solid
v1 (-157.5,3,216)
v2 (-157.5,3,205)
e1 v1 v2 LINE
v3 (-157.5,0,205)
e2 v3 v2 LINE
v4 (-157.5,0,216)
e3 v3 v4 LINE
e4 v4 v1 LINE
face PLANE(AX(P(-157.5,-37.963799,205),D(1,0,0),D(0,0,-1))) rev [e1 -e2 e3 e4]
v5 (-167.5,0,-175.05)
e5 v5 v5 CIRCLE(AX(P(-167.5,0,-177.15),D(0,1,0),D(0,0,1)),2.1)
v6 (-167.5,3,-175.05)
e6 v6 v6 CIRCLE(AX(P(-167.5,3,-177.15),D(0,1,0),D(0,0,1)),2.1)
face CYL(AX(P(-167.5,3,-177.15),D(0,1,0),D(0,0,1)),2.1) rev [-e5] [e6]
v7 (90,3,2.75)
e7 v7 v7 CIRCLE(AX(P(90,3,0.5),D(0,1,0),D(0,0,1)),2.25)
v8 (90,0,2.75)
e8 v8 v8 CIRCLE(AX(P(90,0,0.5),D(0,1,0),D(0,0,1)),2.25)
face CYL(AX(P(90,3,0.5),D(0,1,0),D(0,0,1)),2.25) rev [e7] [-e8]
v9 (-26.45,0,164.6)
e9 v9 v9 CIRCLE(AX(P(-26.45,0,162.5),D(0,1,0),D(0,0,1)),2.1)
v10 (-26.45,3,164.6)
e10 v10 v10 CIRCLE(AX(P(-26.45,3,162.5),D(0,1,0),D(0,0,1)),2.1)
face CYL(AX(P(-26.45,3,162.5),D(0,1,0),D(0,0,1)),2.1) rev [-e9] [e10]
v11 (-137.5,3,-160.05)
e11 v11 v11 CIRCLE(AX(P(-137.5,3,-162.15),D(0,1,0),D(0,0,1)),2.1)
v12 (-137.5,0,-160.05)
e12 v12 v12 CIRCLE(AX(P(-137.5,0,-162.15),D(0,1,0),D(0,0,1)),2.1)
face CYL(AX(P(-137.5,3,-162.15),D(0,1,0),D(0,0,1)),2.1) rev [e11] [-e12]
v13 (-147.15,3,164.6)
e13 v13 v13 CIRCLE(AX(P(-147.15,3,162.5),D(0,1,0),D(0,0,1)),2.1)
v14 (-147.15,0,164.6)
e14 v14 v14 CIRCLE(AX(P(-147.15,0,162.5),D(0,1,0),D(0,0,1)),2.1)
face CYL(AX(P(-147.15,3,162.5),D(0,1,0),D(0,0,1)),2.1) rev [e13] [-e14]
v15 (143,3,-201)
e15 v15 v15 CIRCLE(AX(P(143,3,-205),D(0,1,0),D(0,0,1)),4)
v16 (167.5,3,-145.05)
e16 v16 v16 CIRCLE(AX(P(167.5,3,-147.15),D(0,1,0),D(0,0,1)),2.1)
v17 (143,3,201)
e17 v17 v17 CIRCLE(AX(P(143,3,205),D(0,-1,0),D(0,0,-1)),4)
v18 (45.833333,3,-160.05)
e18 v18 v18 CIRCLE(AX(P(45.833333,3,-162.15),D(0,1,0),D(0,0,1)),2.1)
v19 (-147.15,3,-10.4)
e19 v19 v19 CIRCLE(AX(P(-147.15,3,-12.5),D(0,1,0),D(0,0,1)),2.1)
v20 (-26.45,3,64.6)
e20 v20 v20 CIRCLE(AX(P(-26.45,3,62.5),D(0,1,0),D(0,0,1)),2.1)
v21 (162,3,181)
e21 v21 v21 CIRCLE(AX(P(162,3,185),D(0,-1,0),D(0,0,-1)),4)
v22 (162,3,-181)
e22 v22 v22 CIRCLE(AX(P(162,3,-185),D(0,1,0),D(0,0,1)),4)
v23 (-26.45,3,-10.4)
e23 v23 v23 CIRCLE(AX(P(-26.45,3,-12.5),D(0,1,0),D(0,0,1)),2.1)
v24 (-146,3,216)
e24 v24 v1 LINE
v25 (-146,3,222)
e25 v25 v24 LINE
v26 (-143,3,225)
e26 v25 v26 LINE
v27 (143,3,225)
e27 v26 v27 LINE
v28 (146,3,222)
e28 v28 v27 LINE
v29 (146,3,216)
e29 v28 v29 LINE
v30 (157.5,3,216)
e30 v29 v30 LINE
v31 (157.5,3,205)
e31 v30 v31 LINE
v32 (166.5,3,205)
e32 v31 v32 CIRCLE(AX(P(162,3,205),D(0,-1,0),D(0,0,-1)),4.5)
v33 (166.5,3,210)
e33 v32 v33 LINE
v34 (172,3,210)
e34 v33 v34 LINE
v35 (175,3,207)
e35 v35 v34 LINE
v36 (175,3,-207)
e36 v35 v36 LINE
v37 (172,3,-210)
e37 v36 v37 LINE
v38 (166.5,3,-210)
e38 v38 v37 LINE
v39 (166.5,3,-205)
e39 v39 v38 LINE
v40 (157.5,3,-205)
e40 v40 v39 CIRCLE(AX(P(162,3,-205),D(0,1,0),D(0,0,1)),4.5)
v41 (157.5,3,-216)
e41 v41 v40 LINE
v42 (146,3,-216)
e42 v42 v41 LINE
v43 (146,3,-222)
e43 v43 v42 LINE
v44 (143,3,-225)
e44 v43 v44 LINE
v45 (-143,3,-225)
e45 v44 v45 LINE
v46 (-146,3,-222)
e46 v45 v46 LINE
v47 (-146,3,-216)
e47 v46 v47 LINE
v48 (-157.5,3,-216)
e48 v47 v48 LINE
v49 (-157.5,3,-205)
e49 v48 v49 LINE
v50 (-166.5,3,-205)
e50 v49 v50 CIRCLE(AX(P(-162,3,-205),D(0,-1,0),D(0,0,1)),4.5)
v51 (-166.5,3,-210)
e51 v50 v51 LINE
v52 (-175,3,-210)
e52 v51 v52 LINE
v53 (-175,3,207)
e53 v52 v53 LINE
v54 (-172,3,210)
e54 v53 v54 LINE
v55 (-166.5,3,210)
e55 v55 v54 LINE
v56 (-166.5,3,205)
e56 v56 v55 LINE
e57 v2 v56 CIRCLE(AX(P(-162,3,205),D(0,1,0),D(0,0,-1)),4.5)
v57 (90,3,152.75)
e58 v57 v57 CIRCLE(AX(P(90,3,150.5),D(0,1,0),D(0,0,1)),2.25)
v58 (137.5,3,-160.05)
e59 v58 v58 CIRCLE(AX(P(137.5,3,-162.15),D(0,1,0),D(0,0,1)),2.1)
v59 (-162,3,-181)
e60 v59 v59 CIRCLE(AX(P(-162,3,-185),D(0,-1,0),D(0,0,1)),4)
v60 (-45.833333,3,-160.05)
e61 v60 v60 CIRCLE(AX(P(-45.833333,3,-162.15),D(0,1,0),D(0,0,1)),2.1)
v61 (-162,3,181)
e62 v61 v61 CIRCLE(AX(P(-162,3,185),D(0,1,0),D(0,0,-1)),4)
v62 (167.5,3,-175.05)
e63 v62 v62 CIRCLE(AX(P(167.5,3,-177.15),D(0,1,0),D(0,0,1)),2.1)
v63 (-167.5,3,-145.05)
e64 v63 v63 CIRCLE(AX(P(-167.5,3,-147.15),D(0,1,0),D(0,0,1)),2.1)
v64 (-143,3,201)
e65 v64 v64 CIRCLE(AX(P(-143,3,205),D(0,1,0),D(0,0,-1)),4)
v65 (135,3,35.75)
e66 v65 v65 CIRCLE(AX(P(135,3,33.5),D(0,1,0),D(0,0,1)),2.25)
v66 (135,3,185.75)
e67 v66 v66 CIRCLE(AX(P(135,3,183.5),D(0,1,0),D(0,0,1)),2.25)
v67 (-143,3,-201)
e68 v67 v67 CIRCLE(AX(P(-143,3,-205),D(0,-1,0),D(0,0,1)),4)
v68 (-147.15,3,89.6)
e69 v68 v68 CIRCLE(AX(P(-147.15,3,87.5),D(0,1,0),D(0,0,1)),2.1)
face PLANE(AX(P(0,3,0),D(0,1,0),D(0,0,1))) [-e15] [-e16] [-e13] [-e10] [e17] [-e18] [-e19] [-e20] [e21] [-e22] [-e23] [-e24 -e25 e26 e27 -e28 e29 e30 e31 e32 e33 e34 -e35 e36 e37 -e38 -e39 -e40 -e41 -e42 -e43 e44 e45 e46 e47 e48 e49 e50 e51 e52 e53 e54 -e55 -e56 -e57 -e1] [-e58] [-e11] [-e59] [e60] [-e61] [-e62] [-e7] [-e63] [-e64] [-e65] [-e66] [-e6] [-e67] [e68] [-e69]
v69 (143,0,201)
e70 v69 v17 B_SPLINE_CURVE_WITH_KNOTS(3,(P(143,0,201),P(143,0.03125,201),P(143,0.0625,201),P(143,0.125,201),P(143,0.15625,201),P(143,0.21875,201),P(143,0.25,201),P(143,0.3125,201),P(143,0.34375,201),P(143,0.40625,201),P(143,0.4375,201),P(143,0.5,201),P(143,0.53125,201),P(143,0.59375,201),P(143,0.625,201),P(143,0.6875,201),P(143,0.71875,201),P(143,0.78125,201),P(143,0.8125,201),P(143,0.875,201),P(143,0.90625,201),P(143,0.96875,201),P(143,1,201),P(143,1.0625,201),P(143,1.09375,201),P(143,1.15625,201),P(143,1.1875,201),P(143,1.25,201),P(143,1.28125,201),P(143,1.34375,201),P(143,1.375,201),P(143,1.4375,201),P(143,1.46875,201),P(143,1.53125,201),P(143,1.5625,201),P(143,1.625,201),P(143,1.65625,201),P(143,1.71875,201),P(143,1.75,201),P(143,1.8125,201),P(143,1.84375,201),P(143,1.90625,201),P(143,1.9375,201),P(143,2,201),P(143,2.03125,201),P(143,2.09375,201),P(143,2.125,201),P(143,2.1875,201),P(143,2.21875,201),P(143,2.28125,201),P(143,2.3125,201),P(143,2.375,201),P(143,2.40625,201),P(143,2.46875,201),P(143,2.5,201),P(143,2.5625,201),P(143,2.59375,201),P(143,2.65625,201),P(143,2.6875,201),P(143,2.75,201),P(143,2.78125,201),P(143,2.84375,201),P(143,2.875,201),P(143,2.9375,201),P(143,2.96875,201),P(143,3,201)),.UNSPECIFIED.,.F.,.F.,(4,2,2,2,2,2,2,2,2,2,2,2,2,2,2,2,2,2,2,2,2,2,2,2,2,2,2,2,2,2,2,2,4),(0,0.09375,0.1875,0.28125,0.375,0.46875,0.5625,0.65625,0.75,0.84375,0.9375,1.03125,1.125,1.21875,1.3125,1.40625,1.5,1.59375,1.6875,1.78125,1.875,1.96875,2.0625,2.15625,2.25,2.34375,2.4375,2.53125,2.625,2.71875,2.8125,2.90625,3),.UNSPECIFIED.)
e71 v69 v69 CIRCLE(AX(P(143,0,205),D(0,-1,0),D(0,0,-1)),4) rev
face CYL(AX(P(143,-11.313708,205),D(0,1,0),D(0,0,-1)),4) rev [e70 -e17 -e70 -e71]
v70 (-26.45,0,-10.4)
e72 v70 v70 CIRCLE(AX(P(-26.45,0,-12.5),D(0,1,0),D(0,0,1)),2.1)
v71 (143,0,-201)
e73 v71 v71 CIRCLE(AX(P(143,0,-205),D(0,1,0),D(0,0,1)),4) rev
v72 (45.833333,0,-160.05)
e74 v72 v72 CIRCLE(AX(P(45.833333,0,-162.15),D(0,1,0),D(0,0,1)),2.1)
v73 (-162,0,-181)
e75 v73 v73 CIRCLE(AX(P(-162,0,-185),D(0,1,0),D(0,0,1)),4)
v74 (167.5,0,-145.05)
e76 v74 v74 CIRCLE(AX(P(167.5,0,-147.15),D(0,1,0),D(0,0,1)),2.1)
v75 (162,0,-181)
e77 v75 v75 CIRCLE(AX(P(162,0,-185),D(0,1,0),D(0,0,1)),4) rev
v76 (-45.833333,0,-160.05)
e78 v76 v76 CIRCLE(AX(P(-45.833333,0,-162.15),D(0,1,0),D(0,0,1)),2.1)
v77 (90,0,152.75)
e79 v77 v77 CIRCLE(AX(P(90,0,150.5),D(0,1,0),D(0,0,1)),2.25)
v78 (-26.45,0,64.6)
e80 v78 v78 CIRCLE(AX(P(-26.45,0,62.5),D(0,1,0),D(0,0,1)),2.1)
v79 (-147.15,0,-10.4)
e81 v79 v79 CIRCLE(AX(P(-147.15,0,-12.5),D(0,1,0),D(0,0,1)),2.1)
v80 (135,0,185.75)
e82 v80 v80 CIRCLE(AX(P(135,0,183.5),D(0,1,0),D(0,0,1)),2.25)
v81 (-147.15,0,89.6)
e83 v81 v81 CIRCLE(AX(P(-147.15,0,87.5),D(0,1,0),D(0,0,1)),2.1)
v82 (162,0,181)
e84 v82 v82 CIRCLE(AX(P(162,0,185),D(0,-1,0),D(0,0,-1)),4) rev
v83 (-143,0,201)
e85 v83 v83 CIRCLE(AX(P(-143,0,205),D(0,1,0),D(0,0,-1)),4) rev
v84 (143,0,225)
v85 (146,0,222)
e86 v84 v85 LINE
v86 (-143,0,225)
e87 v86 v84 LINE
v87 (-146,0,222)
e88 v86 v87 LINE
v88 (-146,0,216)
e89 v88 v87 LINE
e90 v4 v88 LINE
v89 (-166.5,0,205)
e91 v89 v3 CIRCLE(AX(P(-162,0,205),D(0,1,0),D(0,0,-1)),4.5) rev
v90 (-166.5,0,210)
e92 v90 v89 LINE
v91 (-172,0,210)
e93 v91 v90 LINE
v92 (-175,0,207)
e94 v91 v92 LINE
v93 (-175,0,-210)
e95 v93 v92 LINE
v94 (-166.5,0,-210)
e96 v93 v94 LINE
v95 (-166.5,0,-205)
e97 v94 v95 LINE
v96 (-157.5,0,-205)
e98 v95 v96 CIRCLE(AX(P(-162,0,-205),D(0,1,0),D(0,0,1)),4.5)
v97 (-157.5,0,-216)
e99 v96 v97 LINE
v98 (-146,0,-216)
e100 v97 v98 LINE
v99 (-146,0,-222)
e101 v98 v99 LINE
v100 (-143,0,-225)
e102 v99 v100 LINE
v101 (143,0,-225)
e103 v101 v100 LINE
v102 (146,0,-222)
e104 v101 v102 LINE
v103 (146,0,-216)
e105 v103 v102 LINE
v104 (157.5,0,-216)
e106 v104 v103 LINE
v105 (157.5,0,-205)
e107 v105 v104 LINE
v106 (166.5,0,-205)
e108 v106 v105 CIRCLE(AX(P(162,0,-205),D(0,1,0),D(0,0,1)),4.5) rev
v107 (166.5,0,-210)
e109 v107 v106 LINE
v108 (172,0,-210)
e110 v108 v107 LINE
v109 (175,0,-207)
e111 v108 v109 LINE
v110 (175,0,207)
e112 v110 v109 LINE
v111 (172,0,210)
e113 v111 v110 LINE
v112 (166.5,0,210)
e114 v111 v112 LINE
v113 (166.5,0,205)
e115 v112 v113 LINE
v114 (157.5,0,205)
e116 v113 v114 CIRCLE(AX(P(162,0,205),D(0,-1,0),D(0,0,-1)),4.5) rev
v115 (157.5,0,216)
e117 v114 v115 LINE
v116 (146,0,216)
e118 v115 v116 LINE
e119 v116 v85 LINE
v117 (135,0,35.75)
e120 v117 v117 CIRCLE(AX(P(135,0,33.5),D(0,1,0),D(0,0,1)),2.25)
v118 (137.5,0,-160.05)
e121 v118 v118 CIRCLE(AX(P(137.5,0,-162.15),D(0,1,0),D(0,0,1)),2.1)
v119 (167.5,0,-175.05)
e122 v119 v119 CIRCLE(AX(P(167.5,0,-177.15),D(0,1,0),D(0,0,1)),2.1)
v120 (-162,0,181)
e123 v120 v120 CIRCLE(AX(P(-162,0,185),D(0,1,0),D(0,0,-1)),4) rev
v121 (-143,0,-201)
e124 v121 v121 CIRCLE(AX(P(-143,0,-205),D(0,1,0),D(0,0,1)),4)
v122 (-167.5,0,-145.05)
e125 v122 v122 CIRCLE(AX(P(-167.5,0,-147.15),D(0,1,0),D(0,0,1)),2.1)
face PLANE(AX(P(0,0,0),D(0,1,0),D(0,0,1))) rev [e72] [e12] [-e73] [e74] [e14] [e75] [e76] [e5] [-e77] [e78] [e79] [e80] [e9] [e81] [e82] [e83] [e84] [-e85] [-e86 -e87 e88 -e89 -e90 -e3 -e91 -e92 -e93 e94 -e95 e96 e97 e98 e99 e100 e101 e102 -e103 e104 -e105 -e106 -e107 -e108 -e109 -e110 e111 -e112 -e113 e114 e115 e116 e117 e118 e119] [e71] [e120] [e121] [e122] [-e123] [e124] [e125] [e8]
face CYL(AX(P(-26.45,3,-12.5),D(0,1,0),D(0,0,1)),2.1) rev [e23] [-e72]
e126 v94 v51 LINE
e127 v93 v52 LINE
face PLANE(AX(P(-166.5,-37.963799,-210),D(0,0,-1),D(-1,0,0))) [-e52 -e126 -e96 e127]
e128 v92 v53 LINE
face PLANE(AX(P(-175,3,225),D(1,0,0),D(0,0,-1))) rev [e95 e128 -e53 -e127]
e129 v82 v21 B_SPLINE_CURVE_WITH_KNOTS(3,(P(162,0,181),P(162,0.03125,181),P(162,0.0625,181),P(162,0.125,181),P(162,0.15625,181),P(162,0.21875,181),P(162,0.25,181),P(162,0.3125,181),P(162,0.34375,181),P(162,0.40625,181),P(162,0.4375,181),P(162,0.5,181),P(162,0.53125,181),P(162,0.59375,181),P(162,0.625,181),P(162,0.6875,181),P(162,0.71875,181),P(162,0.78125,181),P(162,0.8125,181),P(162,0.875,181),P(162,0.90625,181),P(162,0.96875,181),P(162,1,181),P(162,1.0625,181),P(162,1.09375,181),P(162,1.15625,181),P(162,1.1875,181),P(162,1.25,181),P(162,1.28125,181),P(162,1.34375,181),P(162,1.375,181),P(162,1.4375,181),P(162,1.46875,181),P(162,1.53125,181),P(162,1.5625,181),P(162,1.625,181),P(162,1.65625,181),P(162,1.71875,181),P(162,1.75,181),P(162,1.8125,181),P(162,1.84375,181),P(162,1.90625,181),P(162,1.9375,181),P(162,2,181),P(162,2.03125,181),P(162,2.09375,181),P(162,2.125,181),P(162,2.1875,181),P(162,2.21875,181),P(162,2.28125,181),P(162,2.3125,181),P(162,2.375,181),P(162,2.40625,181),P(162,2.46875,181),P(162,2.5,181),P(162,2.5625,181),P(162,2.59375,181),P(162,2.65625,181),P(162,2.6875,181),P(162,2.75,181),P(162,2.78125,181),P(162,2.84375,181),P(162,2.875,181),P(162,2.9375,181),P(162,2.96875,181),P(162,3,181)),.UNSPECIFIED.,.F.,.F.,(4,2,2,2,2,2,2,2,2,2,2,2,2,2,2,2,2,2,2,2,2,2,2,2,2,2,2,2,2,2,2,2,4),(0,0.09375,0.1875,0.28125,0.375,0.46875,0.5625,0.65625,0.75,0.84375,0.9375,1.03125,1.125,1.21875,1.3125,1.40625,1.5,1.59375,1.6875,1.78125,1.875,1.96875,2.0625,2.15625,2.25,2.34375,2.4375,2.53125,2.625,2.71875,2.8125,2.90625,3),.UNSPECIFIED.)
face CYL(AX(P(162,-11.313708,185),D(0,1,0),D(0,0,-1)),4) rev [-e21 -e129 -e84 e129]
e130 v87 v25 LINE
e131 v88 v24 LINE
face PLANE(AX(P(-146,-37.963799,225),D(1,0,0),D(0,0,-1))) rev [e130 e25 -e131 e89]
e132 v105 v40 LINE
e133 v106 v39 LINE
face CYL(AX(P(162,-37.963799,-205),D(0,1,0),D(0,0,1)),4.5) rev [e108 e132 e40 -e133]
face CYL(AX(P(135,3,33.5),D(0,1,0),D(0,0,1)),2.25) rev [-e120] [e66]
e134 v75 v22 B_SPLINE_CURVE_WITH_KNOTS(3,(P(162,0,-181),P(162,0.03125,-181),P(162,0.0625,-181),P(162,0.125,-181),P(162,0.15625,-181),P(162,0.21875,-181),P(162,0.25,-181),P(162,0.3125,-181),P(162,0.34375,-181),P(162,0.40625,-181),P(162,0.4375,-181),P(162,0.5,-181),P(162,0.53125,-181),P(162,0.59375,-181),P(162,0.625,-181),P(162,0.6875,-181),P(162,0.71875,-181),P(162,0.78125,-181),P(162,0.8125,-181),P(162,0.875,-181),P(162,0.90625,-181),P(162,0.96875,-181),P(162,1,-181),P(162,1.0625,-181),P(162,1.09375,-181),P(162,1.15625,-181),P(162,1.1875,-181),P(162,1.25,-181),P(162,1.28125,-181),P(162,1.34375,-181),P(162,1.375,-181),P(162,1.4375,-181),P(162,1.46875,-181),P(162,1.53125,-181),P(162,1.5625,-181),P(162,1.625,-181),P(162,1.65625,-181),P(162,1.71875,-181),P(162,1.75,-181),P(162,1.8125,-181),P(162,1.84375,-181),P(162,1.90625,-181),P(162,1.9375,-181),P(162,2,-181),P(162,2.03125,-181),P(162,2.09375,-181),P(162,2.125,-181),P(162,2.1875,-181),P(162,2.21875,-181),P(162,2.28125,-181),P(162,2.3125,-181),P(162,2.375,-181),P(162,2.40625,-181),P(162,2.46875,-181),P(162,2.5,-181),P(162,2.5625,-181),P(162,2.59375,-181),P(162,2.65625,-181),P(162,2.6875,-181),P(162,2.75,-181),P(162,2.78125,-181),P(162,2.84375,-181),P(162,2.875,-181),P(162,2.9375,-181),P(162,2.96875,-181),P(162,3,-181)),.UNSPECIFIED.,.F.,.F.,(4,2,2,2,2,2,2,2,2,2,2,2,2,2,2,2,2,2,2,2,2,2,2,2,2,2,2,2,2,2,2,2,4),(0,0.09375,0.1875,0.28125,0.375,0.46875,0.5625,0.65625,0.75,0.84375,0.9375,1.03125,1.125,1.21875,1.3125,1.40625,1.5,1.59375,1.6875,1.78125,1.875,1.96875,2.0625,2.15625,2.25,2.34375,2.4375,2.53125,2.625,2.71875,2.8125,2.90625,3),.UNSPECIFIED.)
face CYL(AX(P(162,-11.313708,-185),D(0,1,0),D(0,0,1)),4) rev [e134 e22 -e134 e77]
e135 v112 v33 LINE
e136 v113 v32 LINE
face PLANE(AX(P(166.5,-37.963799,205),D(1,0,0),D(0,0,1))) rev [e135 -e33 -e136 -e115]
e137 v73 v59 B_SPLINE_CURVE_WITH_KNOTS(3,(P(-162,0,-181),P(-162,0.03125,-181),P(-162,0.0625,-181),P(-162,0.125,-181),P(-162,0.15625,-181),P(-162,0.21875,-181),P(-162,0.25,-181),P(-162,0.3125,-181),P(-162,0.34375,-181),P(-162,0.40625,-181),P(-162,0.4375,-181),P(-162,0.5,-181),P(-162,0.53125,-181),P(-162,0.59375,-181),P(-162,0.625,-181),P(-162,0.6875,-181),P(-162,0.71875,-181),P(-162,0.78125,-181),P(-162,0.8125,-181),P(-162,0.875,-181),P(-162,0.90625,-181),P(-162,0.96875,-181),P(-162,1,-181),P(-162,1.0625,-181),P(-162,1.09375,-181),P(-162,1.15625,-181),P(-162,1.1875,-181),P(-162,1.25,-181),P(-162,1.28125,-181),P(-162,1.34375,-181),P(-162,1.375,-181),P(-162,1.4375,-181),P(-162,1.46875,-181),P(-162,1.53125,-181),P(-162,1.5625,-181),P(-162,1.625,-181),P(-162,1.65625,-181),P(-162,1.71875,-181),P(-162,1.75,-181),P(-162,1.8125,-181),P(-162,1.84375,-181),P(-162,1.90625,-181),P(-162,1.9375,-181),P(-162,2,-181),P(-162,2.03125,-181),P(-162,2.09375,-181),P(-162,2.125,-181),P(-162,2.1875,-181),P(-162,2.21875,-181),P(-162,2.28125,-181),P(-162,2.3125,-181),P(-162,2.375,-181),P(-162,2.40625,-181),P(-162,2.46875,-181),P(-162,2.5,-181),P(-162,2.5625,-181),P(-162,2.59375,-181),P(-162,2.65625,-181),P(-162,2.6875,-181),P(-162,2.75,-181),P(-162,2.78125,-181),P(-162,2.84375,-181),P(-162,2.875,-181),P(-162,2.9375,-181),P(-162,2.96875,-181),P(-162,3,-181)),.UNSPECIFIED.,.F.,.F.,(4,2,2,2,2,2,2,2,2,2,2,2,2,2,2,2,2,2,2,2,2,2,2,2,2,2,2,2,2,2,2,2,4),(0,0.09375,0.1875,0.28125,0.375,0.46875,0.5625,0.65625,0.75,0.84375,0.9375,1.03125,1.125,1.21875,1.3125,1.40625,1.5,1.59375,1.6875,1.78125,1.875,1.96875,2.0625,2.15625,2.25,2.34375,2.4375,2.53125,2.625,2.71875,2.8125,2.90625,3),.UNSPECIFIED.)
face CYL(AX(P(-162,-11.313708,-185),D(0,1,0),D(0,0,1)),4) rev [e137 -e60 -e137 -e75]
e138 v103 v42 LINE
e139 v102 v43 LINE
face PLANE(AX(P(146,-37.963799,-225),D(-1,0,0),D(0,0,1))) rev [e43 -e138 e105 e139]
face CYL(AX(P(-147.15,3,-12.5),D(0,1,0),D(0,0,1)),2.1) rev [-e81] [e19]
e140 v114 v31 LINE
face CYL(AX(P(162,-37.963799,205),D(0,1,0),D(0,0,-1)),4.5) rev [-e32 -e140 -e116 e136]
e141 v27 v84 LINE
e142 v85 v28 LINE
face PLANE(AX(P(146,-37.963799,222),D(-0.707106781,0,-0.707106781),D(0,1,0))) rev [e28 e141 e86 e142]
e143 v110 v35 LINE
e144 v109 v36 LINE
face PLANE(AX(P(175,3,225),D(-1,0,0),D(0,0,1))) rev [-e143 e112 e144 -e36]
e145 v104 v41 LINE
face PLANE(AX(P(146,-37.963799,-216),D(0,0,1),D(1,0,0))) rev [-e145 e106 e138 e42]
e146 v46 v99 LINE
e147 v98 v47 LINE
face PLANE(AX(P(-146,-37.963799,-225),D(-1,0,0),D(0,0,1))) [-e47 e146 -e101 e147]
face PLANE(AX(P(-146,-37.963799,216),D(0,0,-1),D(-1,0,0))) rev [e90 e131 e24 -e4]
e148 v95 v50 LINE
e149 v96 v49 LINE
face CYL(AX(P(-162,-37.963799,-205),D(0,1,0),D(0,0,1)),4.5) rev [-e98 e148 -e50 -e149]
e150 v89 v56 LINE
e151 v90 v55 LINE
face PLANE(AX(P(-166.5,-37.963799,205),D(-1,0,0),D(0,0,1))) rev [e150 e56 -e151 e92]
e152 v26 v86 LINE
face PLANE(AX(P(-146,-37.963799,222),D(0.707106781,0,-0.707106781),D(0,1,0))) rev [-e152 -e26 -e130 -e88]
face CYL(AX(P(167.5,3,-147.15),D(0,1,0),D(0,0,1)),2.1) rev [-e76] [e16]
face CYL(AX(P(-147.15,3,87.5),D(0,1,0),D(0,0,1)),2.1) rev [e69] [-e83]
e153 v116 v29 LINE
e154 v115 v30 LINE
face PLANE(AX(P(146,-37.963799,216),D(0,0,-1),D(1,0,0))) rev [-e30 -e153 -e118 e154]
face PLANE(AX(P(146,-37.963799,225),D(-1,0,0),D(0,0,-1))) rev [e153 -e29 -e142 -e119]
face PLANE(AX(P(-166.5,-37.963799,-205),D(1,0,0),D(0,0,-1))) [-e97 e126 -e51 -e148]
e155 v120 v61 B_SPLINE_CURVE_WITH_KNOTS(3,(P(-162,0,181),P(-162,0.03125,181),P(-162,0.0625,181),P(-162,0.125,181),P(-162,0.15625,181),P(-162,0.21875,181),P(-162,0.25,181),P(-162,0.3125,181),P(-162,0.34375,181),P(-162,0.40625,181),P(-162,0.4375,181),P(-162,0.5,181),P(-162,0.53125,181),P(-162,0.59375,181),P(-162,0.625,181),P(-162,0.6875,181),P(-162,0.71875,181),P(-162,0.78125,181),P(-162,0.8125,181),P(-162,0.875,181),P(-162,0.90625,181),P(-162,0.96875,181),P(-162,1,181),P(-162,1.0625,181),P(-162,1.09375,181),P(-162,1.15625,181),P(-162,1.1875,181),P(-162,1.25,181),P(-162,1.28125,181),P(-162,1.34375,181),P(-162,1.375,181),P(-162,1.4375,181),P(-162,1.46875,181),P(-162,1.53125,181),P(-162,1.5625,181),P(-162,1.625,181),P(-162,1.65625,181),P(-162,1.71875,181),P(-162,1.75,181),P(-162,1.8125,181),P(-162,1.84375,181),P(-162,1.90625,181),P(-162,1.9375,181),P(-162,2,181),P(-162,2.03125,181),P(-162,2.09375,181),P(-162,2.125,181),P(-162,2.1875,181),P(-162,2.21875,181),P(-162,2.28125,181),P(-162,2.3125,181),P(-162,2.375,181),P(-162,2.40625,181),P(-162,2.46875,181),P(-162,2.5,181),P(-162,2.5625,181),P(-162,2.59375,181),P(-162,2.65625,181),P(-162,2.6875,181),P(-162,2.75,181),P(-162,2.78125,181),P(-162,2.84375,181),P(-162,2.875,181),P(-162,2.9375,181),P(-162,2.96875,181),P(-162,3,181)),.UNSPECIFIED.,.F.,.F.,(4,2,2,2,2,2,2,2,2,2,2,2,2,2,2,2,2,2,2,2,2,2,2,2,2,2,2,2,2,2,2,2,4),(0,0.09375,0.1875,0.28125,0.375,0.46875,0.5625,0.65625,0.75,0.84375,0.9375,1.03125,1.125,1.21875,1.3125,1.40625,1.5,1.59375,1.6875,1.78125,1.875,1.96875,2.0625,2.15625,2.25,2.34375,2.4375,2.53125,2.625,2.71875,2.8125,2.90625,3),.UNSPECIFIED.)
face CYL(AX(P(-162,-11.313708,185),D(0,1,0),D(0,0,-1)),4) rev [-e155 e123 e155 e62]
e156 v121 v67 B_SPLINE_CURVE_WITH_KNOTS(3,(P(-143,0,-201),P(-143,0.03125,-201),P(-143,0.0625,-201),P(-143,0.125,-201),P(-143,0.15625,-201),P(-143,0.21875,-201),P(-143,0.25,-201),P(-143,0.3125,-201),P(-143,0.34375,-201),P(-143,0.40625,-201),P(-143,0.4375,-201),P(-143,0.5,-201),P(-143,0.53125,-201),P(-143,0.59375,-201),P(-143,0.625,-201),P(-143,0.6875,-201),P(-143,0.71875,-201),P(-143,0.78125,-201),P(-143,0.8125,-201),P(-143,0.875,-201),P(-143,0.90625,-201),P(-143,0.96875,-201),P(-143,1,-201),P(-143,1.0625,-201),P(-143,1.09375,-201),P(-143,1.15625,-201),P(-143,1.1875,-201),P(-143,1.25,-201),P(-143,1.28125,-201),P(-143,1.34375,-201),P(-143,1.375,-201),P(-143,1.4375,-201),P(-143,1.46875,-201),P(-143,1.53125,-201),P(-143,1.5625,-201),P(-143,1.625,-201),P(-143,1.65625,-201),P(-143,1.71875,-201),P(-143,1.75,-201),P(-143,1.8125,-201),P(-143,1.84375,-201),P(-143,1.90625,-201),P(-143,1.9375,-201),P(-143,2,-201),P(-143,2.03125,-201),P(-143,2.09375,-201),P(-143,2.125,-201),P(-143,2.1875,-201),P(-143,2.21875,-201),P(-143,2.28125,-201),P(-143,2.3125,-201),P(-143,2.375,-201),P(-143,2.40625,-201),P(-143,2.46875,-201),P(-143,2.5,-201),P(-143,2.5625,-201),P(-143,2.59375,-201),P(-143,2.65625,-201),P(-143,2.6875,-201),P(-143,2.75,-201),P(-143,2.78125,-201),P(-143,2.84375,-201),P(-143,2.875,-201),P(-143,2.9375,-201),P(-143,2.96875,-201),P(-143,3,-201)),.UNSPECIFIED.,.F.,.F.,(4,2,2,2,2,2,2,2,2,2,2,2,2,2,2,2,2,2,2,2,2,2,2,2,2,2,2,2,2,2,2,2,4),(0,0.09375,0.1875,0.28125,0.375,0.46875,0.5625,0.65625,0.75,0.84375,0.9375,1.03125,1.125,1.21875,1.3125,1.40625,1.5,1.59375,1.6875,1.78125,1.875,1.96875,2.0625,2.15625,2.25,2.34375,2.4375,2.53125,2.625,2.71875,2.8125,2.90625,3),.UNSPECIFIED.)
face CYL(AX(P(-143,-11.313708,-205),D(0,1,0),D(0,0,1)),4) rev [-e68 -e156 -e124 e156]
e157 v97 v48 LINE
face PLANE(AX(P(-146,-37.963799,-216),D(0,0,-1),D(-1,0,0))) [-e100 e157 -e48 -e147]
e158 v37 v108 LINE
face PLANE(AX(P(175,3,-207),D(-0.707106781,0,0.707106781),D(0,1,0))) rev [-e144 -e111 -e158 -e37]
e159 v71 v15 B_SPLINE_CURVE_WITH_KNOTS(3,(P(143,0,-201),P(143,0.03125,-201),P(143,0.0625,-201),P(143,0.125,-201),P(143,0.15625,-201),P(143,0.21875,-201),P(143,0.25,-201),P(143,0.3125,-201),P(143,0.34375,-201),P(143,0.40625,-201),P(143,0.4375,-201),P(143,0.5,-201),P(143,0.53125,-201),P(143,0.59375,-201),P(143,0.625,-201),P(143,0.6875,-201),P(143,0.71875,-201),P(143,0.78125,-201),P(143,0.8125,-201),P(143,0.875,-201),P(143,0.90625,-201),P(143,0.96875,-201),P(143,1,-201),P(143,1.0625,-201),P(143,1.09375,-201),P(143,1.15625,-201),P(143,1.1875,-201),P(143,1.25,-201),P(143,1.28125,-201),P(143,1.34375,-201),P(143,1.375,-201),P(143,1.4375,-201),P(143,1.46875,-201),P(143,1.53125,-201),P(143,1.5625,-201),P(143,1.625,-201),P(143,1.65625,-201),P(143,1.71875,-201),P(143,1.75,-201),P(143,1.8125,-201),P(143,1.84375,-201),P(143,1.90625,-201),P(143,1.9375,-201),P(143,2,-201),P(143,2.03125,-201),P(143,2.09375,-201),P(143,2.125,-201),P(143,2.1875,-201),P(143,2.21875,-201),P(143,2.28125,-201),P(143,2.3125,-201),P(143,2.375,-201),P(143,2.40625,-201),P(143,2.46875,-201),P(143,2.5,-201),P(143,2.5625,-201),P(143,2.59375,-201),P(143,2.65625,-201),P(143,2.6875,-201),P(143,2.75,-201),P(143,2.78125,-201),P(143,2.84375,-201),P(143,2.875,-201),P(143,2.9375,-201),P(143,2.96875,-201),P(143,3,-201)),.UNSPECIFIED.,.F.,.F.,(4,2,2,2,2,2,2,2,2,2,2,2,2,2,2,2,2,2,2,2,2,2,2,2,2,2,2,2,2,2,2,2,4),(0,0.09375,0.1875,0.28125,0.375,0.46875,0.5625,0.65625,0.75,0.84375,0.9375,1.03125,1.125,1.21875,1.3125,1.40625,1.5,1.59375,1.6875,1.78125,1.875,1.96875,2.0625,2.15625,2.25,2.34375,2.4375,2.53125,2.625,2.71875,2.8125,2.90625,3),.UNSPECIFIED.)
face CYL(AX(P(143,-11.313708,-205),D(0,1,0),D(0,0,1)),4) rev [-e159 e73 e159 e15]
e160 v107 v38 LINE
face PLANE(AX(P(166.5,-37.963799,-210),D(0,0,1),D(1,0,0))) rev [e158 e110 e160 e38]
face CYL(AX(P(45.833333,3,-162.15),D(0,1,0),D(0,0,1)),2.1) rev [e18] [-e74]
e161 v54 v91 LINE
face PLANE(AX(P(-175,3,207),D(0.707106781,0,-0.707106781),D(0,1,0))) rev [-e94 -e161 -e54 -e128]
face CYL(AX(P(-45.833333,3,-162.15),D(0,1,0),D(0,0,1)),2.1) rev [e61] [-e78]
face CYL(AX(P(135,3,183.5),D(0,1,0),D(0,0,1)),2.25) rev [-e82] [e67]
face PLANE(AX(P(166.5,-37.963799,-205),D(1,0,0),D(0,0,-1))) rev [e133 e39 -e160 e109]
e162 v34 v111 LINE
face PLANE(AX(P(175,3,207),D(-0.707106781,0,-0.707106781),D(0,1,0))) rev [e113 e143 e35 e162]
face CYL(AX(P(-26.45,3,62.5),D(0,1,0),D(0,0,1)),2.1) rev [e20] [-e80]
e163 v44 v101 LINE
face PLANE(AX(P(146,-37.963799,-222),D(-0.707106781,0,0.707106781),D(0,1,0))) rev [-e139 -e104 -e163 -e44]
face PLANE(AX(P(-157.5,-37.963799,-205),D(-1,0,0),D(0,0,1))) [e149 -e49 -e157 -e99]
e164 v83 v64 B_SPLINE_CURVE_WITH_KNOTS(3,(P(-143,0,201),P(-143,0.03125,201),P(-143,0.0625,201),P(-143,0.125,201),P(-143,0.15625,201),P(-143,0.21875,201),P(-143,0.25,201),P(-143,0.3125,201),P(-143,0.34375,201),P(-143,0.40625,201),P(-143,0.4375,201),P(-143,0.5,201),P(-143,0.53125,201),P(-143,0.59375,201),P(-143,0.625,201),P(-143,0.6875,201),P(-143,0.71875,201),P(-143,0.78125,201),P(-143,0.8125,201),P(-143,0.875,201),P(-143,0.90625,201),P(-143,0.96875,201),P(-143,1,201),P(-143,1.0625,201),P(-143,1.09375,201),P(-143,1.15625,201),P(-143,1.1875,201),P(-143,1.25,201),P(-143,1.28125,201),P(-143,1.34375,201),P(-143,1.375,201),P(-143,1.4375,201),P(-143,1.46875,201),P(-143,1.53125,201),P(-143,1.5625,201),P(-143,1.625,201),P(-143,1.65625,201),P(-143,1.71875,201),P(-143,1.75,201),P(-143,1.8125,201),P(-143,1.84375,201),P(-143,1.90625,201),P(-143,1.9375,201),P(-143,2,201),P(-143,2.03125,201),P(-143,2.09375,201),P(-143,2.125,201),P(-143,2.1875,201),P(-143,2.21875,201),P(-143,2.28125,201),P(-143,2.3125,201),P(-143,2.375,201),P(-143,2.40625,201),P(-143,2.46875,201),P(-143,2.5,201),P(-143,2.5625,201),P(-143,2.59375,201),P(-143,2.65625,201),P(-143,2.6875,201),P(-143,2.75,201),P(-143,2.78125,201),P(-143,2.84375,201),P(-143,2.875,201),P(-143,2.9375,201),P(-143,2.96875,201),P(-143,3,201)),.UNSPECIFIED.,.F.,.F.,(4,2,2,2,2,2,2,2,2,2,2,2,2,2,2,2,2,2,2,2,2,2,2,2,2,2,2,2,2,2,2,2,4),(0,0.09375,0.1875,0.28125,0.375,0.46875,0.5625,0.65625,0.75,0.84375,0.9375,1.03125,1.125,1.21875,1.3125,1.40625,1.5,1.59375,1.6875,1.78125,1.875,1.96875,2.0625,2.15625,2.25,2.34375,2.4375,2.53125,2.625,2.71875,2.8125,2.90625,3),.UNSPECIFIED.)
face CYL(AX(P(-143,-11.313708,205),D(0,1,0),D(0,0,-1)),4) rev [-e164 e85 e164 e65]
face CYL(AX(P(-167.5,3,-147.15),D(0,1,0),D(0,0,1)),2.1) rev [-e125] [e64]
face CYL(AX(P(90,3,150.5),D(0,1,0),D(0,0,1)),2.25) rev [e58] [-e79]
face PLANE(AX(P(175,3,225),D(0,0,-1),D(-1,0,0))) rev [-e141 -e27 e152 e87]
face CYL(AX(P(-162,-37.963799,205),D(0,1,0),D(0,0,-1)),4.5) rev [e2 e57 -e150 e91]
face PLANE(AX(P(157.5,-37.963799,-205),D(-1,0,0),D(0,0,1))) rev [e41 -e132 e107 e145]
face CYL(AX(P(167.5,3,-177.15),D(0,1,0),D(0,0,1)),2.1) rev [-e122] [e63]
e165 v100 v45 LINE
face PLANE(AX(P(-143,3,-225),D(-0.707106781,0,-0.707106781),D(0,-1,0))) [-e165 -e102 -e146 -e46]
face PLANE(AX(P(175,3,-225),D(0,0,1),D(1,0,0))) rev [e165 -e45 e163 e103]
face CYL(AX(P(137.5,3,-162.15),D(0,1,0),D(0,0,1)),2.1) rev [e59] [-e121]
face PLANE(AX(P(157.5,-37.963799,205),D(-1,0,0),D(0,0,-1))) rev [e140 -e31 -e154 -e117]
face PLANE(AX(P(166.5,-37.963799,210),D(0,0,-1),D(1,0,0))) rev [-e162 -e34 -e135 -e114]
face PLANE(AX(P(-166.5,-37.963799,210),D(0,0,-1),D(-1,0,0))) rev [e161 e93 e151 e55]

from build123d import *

# Parameters (mm, degrees)
SKETCH2_W                   = 350
SKETCH2_H                   = 450
BOSS_EXTRUDE1_DEPTH         = 3
CUT_EXTRUDE1_DEPTH          = 3
CHAMFER1_SIZE               = 3
SKETCH4_R                   = 4
CUT_EXTRUDE2_DEPTH          = 3
MIRROR1_OUTLINE_R           = 4
MIRROR1_DEPTH               = 3
MIRROR3_OUTLINE_R           = 4
MIRROR3_DEPTH               = 3
TAP_DRILL_FOR_M5X0_8_TAP1_D = 4.2
M4_CLEARANCE_HOLE1_D        = 4.5


# Read off the part's stored shape, not the designer's step: Mirror1, Mirror3
with BuildPart() as part:
    # Sketch2 → Boss-Extrude1 (new body)
    with BuildSketch(Plane(origin=(0, 0, 0), x_dir=(1, 0, 0), z_dir=(0, 1, 0))):
        Rectangle(SKETCH2_W, SKETCH2_H)
    extrude(amount=BOSS_EXTRUDE1_DEPTH)

    # Sketch3 → Cut-Extrude1 (cut)
    with BuildSketch(Plane(origin=(0, 3, 0), x_dir=(1, 0, 0), z_dir=(0, 1, 0))):
        with BuildLine():
            Line((146, 225), (146, 216))
            Line((146, 216), (157.5, 216))
            Line((157.5, 216), (157.5, 205))
            ThreePointArc((157.5, 205), (162, 200.5), (166.5, 205))
            Line((166.5, 205), (166.5, 210))
            Line((166.5, 210), (175, 210))
            Line((175, 210), (175, 225))
            Line((175, 225), (146, 225))
        make_face()
    extrude(amount=-CUT_EXTRUDE1_DEPTH, mode=Mode.SUBTRACT)

    # Chamfer1
    chamfer1_edges = [part.edges().sort_by_distance(p)[0] for p in [
        (146, 1.5, -225),
        (175, 1.5, -210),
    ]]
    chamfer(chamfer1_edges, length=CHAMFER1_SIZE)

    # Sketch4 → Cut-Extrude2 (cut)
    with BuildSketch(Plane(origin=(0, 3, 0), x_dir=(1, 0, 0), z_dir=(0, 1, 0))):
        with Locations(Location((143, 205, 0), (0, 0, 270))):
            Circle(SKETCH4_R)
        with Locations(Location((162, 185, 0), (0, 0, 270))):
            Circle(SKETCH4_R)
    extrude(amount=-CUT_EXTRUDE2_DEPTH, mode=Mode.SUBTRACT)

    # Mirror1 outline → Mirror1 (cut)
    with BuildSketch(Plane(origin=(0, 0, 0), x_dir=(1, 0, 0), z_dir=(0, 1, 0))):
        with BuildLine():
            Line((-175, 210), (-166.5, 210))
            Line((-166.5, 210), (-166.5, 205))
            ThreePointArc((-166.5, 205), (-162, 200.5), (-157.5, 205))
            Line((-157.5, 205), (-157.5, 216))
            Line((-157.5, 216), (-146, 216))
            Line((-146, 216), (-146, 222))
            Line((-146, 222), (-143, 225))
            Line((-143, 225), (-175, 225))
            Line((-175, 225), (-175, 210))
        make_face()
        with Locations((-162, 185)):
            Circle(MIRROR1_OUTLINE_R)
        with Locations((-143, 205)):
            Circle(MIRROR1_OUTLINE_R)
    extrude(amount=MIRROR1_DEPTH, mode=Mode.SUBTRACT)

    # Mirror3 outline → Mirror3 (cut)
    with BuildSketch(Plane(origin=(0, 0, 0), x_dir=(1, 0, 0), z_dir=(0, 1, 0))):
        with BuildLine():
            Line((172, -210), (166.5, -210))
            Line((166.5, -210), (166.5, -205))
            ThreePointArc((166.5, -205), (162, -200.5), (157.5, -205))
            Line((157.5, -205), (157.5, -216))
            Line((157.5, -216), (146, -216))
            Line((146, -216), (146, -222))
            Line((146, -222), (143, -225))
            Line((143, -225), (175, -225))
            Line((175, -225), (175, -207))
            Line((175, -207), (172, -210))
        make_face()
        with BuildLine():
            Line((-175, -225), (-143, -225))
            Line((-143, -225), (-146, -222))
            Line((-146, -222), (-146, -216))
            Line((-146, -216), (-157.5, -216))
            Line((-157.5, -216), (-157.5, -205))
            ThreePointArc((-157.5, -205), (-162, -200.5), (-166.5, -205))
            Line((-166.5, -205), (-166.5, -210))
            Line((-166.5, -210), (-172, -210))
            Line((-172, -210), (-175, -207))
            Line((-175, -207), (-175, -225))
        make_face()
        with Locations((-143, -205)):
            Circle(MIRROR3_OUTLINE_R)
        with Locations((143, -205)):
            Circle(MIRROR3_OUTLINE_R)
        with Locations((-162, -185)):
            Circle(MIRROR3_OUTLINE_R)
        with Locations((162, -185)):
            Circle(MIRROR3_OUTLINE_R)
    extrude(amount=MIRROR3_DEPTH, mode=Mode.SUBTRACT)

    # Tap Drill for M5x0.8 Tap1 (through all)
    with Locations(Plane(origin=(0, 3, 0), x_dir=(1, 0, 0), z_dir=(0, 1, 0))):
        with Locations((-147.15, 12.5), (-26.45, 12.5), (-26.45, -162.5), (-147.15, -162.5), (-137.5, 162.15), (-167.5, 177.15), (-167.5, 147.15), (137.5, 162.15), (167.5, 177.15), (167.5, 147.15), (-147.15, -87.5), (-26.45, -62.5), (-45.833333333, 162.15), (45.833333333, 162.15)):
            Hole(TAP_DRILL_FOR_M5X0_8_TAP1_D / 2)

    # M4 Clearance Hole1 (through all)
    with Locations(Plane(origin=(0, 3, 0), x_dir=(1, 0, 0), z_dir=(0, 1, 0))):
        with Locations((90, -0.5), (135, -33.5), (135, -183.5), (90, -150.5)):
            Hole(M4_CLEARANCE_HOLE1_D / 2)


solid = part.part
